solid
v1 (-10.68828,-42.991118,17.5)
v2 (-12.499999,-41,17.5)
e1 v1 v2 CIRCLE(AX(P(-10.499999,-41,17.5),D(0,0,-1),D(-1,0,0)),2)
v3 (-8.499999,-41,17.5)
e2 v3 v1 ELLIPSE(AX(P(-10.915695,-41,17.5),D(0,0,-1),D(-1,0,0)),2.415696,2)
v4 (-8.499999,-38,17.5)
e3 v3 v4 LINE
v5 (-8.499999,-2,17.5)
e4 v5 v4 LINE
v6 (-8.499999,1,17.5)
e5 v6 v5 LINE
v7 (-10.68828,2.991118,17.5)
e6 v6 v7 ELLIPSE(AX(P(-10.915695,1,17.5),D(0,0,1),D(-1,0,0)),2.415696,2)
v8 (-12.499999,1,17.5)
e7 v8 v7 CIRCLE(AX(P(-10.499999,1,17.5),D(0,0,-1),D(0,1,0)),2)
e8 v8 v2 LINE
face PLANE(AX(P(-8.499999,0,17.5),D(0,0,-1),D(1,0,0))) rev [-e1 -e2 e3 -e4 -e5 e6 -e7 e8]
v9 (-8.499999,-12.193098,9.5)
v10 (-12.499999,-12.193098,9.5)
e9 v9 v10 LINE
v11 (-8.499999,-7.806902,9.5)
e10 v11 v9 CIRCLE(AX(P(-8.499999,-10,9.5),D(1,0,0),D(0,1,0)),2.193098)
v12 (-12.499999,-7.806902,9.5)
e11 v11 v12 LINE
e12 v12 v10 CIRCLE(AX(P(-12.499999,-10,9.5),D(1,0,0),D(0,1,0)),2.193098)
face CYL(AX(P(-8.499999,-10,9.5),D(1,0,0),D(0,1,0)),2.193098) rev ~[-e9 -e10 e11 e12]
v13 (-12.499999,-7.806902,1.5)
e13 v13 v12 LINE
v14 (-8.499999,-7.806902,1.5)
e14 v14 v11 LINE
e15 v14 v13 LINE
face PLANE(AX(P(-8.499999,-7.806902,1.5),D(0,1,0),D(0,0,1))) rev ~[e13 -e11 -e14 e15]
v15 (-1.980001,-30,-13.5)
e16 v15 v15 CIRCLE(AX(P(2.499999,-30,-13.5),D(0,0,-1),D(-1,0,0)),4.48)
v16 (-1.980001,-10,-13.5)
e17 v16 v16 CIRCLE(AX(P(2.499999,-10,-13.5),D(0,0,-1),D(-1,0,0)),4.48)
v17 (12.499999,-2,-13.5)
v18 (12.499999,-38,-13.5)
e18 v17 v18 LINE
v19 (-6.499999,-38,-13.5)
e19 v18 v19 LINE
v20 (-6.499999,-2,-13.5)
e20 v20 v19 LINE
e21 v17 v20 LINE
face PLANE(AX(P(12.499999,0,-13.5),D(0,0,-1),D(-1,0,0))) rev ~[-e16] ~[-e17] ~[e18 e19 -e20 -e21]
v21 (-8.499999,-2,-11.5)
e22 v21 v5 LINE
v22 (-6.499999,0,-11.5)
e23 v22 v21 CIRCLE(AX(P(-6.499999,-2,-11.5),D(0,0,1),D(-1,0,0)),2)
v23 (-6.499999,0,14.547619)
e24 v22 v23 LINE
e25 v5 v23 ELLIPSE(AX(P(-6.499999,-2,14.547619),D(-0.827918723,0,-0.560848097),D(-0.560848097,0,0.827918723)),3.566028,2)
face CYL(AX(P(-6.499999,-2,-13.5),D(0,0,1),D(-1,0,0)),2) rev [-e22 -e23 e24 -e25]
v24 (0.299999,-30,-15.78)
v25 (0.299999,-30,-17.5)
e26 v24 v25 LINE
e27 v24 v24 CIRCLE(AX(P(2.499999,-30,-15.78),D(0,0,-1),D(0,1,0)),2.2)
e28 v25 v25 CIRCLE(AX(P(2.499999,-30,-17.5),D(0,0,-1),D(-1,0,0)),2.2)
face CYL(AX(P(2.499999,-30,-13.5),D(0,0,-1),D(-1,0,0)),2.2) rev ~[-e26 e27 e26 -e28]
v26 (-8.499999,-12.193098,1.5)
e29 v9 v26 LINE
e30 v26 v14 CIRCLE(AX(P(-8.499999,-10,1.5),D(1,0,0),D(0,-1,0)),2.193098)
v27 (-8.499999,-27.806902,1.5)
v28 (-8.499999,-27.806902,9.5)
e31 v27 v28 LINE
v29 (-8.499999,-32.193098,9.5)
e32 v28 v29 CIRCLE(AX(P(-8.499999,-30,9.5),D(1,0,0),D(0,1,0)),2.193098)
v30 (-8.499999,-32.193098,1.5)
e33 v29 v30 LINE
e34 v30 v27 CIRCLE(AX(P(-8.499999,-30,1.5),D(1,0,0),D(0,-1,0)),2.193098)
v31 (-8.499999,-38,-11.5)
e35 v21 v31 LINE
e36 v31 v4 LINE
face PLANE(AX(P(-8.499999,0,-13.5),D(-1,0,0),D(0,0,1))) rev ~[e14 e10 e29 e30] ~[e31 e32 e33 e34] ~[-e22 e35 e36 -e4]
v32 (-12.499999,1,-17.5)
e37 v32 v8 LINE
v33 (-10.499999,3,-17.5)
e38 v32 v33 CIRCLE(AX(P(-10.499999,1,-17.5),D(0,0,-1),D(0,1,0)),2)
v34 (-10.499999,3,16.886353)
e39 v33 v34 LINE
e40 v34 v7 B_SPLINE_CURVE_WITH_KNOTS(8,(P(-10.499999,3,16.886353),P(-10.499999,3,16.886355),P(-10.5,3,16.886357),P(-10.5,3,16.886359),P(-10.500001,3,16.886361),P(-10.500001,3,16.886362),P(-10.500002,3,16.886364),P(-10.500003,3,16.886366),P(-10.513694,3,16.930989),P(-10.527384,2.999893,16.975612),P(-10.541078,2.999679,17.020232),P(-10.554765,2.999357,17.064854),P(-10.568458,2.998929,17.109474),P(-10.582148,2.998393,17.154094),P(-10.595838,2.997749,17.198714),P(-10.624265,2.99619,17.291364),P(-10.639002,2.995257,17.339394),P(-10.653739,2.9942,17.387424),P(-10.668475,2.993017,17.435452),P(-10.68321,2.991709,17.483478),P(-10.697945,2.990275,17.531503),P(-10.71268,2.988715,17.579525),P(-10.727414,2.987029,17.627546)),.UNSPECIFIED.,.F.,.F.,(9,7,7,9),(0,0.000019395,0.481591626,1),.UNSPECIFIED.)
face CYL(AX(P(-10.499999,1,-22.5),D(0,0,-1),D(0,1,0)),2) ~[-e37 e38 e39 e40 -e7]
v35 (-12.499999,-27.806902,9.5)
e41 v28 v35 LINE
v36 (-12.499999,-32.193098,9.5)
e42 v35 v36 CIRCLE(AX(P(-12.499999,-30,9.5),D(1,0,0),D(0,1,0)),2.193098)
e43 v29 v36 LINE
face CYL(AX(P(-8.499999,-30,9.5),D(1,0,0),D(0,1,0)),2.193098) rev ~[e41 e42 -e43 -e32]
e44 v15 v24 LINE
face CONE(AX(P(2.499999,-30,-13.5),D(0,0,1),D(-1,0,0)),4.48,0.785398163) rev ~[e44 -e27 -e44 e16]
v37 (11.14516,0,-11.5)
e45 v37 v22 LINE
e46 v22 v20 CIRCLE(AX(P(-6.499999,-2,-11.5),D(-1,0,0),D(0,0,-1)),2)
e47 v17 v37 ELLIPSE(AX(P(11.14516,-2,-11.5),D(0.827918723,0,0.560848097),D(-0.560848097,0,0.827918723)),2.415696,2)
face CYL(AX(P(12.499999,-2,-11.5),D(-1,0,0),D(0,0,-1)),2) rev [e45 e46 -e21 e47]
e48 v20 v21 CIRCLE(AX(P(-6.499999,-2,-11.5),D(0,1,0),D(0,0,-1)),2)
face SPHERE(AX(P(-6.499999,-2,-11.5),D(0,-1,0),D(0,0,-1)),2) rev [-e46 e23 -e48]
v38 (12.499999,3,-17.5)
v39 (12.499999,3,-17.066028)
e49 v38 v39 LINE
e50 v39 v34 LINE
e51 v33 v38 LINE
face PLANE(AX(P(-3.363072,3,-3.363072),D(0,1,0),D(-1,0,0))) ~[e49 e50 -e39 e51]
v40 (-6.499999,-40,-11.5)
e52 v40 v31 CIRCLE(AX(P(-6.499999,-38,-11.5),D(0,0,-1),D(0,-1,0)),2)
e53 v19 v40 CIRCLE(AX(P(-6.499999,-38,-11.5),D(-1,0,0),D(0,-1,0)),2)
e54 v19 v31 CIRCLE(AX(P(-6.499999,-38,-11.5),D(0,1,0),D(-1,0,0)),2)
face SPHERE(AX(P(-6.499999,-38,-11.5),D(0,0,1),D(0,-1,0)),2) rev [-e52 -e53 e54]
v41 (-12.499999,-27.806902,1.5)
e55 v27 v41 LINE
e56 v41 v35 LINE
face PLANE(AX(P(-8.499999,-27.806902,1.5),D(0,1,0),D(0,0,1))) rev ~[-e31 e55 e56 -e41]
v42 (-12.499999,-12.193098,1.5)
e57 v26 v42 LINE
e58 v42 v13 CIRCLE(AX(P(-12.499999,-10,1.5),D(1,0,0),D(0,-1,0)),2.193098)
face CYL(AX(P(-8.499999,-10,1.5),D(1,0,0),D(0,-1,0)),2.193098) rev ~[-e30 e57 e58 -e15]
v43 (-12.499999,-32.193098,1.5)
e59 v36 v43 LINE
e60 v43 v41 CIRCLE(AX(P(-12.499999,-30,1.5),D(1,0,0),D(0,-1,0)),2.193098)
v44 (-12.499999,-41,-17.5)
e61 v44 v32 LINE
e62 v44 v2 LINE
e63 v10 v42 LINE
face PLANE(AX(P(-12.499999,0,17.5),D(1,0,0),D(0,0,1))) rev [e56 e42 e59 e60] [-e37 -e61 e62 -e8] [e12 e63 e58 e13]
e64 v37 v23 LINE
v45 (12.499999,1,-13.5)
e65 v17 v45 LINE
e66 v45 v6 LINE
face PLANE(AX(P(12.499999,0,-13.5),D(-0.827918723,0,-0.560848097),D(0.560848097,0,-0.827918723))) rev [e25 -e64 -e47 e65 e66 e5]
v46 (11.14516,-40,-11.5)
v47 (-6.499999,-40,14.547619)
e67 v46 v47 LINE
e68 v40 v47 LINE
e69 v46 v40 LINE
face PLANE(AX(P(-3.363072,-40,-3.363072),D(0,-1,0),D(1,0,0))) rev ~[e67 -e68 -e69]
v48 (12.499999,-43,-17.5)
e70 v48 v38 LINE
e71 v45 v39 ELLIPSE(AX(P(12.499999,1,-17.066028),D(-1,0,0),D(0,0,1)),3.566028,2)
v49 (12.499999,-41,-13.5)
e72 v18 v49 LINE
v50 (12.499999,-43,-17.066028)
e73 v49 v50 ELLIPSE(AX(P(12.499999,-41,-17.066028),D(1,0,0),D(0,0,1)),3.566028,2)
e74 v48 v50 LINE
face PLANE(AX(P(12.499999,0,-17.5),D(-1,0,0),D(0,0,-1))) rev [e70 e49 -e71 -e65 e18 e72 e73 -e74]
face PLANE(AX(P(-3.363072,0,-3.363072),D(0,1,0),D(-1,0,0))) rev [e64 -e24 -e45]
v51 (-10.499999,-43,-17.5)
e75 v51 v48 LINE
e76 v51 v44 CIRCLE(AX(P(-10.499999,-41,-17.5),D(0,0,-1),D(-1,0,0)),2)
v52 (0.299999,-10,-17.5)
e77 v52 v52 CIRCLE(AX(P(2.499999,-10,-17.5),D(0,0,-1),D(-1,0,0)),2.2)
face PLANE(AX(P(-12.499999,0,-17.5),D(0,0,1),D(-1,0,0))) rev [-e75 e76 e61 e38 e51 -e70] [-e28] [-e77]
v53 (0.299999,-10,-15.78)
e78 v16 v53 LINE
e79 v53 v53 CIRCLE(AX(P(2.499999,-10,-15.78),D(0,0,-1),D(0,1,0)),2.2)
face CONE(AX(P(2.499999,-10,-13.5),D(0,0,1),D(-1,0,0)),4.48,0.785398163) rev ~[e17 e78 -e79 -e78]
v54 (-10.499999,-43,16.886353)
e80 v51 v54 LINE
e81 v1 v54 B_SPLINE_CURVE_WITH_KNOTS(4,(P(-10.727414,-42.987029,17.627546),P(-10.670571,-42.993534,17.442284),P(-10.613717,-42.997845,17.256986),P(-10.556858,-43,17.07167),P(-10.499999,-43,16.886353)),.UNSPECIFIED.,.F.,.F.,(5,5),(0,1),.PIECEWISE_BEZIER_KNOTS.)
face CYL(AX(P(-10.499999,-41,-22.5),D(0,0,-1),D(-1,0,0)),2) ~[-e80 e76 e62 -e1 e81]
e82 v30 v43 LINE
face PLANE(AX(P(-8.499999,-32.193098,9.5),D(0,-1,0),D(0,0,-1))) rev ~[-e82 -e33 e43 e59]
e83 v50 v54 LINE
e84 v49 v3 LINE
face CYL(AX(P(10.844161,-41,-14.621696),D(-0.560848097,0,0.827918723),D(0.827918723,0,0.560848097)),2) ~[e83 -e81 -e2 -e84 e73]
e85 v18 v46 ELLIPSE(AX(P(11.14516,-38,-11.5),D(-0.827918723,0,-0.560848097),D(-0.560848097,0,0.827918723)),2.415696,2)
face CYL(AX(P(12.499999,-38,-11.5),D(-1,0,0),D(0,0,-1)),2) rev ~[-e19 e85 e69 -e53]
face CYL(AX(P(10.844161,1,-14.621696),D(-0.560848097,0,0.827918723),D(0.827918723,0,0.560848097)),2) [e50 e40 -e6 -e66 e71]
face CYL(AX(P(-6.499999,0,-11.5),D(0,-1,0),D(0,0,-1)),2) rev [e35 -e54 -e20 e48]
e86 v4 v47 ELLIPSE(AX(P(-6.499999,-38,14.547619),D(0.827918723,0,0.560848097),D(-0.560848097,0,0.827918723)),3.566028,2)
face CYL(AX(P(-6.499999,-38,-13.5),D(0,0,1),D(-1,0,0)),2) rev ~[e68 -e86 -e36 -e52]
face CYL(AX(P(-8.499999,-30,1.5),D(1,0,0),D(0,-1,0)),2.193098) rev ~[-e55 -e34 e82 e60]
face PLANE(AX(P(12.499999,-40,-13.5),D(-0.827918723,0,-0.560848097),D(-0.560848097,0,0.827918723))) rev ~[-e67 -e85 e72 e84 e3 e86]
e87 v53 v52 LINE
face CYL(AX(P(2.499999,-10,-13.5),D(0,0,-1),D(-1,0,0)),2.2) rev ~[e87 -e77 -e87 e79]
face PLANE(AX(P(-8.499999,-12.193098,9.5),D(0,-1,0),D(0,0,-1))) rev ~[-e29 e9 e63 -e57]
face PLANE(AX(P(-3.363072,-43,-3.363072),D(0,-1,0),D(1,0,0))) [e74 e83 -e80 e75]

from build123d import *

# Parameters (mm, degrees)
F1_DEPTH       = 40
F3_DEPTH       = 4
F5_D           = 4.4
F5_CSINK_D     = 8.96
F5_CSINK_ANGLE = 90
F7_DEPTH       = 3
F10_R          = 2
F11_T1_DEPTH   = 45


# Not quite as in the source:
# - a fillet or chamfer that OpenCascade refuses, or shapes differently, is made with other operations: its cross-section is extruded or revolved along the edge and cut away or added


with BuildPart() as f1:
    # F0 (on Front) → F1 (new body)
    with BuildSketch(Plane.XZ):
        Polygon((-12.4999986735, 17.5), (-12.4999986735, -17.5), (12.4999986735, -17.5), (12.4999986735, -13.5), (-8.4999986735, -13.5), (-8.4999986735, 17.5), align=None)
    extrude(amount=F1_DEPTH)

    # F2 (on face) → F3 (cut, through all)
    with BuildSketch(Plane.YZ.offset(-8.4999986735)):
        with BuildLine():
            ThreePointArc((-27.8069023984, 9.5), (-30, 11.6930976016), (-32.1930976016, 9.5))
            Line((-32.1930976016, 9.5), (-32.1930976016, 1.5))
            ThreePointArc((-32.1930976016, 1.5), (-30, -0.6930976016), (-27.8069023984, 1.5))
            Line((-27.8069023984, 1.5), (-27.8069023984, 9.5))
        make_face()
        with BuildLine():
            Line((-7.8069023984, 1.5), (-7.8069023984, 9.5))
            ThreePointArc((-7.8069023984, 9.5), (-10, 11.6930976016), (-12.1930976016, 9.5))
            Line((-12.1930976016, 9.5), (-12.1930976016, 1.5))
            ThreePointArc((-12.1930976016, 1.5), (-10, -0.6930976016), (-7.8069023984, 1.5))
        make_face()
    extrude(amount=-F3_DEPTH, mode=Mode.SUBTRACT)

    # F5 (through all)
    with Locations(Plane.XY.offset(-13.5)):
        with Locations((2.4999986735, -30), (2.4999986735, -10)):
            CounterSinkHole(F5_D / 2, F5_CSINK_D / 2, counter_sink_angle=F5_CSINK_ANGLE)

    # F6 (on face) → F7 (join)
    with BuildSketch(Plane.XZ.offset(40)):
        Polygon((12.4999986735, -13.5), (-8.4999986735, 17.5), (-12.4999986735, 17.5), (-12.4999986735, -17.5), (12.4999986735, -17.5), align=None)
    extrude(amount=F7_DEPTH)

    # F9: F1 across plane


with BuildPart() as f1_1:
    add(f1.part)
    add(f1.part.mirror(Plane(origin=(-5.812499541, -20, -5.812499541), x_dir=(1, 0, 0), z_dir=(0, 1, 0))))

    # F10
    f10_edges = [f1_1.edges().sort_by_distance(p)[0] for p in [
        (-8.499999, -40, 2),
        (2, -40, -13.5),
        (-8.499999, -20, -13.5),
        (2, 0, -13.5),
        (-8.499999, 0, 2),
        (2, 3, 2),
        (2, -43, 2),
    ]]
    fillet(f10_edges, radius=F10_R)

    # F11: fillet of radius 2 on 2 edges, made by hand

    # F11_s2 → F11_t1 (cut)
    with BuildSketch(Plane.XY.offset(-22.5)):
        with BuildLine():
            ThreePointArc((-10.4999986735, 3), (-11.9142122359, 2.4142135624), (-12.4999986735, 1))
            Line((-12.4999986735, 1), (-12.4999986735, 3))
            Line((-12.4999986735, 3), (-10.4999986735, 3))
        make_face()
        with BuildLine():
            ThreePointArc((-12.4999986735, -41), (-11.9142122359, -42.4142135624), (-10.4999986735, -43))
            Line((-10.4999986735, -43), (-12.4999986735, -43))
            Line((-12.4999986735, -43), (-12.4999986735, -41))
        make_face()
    extrude(amount=F11_T1_DEPTH, mode=Mode.SUBTRACT)


solid = f1_1.part
